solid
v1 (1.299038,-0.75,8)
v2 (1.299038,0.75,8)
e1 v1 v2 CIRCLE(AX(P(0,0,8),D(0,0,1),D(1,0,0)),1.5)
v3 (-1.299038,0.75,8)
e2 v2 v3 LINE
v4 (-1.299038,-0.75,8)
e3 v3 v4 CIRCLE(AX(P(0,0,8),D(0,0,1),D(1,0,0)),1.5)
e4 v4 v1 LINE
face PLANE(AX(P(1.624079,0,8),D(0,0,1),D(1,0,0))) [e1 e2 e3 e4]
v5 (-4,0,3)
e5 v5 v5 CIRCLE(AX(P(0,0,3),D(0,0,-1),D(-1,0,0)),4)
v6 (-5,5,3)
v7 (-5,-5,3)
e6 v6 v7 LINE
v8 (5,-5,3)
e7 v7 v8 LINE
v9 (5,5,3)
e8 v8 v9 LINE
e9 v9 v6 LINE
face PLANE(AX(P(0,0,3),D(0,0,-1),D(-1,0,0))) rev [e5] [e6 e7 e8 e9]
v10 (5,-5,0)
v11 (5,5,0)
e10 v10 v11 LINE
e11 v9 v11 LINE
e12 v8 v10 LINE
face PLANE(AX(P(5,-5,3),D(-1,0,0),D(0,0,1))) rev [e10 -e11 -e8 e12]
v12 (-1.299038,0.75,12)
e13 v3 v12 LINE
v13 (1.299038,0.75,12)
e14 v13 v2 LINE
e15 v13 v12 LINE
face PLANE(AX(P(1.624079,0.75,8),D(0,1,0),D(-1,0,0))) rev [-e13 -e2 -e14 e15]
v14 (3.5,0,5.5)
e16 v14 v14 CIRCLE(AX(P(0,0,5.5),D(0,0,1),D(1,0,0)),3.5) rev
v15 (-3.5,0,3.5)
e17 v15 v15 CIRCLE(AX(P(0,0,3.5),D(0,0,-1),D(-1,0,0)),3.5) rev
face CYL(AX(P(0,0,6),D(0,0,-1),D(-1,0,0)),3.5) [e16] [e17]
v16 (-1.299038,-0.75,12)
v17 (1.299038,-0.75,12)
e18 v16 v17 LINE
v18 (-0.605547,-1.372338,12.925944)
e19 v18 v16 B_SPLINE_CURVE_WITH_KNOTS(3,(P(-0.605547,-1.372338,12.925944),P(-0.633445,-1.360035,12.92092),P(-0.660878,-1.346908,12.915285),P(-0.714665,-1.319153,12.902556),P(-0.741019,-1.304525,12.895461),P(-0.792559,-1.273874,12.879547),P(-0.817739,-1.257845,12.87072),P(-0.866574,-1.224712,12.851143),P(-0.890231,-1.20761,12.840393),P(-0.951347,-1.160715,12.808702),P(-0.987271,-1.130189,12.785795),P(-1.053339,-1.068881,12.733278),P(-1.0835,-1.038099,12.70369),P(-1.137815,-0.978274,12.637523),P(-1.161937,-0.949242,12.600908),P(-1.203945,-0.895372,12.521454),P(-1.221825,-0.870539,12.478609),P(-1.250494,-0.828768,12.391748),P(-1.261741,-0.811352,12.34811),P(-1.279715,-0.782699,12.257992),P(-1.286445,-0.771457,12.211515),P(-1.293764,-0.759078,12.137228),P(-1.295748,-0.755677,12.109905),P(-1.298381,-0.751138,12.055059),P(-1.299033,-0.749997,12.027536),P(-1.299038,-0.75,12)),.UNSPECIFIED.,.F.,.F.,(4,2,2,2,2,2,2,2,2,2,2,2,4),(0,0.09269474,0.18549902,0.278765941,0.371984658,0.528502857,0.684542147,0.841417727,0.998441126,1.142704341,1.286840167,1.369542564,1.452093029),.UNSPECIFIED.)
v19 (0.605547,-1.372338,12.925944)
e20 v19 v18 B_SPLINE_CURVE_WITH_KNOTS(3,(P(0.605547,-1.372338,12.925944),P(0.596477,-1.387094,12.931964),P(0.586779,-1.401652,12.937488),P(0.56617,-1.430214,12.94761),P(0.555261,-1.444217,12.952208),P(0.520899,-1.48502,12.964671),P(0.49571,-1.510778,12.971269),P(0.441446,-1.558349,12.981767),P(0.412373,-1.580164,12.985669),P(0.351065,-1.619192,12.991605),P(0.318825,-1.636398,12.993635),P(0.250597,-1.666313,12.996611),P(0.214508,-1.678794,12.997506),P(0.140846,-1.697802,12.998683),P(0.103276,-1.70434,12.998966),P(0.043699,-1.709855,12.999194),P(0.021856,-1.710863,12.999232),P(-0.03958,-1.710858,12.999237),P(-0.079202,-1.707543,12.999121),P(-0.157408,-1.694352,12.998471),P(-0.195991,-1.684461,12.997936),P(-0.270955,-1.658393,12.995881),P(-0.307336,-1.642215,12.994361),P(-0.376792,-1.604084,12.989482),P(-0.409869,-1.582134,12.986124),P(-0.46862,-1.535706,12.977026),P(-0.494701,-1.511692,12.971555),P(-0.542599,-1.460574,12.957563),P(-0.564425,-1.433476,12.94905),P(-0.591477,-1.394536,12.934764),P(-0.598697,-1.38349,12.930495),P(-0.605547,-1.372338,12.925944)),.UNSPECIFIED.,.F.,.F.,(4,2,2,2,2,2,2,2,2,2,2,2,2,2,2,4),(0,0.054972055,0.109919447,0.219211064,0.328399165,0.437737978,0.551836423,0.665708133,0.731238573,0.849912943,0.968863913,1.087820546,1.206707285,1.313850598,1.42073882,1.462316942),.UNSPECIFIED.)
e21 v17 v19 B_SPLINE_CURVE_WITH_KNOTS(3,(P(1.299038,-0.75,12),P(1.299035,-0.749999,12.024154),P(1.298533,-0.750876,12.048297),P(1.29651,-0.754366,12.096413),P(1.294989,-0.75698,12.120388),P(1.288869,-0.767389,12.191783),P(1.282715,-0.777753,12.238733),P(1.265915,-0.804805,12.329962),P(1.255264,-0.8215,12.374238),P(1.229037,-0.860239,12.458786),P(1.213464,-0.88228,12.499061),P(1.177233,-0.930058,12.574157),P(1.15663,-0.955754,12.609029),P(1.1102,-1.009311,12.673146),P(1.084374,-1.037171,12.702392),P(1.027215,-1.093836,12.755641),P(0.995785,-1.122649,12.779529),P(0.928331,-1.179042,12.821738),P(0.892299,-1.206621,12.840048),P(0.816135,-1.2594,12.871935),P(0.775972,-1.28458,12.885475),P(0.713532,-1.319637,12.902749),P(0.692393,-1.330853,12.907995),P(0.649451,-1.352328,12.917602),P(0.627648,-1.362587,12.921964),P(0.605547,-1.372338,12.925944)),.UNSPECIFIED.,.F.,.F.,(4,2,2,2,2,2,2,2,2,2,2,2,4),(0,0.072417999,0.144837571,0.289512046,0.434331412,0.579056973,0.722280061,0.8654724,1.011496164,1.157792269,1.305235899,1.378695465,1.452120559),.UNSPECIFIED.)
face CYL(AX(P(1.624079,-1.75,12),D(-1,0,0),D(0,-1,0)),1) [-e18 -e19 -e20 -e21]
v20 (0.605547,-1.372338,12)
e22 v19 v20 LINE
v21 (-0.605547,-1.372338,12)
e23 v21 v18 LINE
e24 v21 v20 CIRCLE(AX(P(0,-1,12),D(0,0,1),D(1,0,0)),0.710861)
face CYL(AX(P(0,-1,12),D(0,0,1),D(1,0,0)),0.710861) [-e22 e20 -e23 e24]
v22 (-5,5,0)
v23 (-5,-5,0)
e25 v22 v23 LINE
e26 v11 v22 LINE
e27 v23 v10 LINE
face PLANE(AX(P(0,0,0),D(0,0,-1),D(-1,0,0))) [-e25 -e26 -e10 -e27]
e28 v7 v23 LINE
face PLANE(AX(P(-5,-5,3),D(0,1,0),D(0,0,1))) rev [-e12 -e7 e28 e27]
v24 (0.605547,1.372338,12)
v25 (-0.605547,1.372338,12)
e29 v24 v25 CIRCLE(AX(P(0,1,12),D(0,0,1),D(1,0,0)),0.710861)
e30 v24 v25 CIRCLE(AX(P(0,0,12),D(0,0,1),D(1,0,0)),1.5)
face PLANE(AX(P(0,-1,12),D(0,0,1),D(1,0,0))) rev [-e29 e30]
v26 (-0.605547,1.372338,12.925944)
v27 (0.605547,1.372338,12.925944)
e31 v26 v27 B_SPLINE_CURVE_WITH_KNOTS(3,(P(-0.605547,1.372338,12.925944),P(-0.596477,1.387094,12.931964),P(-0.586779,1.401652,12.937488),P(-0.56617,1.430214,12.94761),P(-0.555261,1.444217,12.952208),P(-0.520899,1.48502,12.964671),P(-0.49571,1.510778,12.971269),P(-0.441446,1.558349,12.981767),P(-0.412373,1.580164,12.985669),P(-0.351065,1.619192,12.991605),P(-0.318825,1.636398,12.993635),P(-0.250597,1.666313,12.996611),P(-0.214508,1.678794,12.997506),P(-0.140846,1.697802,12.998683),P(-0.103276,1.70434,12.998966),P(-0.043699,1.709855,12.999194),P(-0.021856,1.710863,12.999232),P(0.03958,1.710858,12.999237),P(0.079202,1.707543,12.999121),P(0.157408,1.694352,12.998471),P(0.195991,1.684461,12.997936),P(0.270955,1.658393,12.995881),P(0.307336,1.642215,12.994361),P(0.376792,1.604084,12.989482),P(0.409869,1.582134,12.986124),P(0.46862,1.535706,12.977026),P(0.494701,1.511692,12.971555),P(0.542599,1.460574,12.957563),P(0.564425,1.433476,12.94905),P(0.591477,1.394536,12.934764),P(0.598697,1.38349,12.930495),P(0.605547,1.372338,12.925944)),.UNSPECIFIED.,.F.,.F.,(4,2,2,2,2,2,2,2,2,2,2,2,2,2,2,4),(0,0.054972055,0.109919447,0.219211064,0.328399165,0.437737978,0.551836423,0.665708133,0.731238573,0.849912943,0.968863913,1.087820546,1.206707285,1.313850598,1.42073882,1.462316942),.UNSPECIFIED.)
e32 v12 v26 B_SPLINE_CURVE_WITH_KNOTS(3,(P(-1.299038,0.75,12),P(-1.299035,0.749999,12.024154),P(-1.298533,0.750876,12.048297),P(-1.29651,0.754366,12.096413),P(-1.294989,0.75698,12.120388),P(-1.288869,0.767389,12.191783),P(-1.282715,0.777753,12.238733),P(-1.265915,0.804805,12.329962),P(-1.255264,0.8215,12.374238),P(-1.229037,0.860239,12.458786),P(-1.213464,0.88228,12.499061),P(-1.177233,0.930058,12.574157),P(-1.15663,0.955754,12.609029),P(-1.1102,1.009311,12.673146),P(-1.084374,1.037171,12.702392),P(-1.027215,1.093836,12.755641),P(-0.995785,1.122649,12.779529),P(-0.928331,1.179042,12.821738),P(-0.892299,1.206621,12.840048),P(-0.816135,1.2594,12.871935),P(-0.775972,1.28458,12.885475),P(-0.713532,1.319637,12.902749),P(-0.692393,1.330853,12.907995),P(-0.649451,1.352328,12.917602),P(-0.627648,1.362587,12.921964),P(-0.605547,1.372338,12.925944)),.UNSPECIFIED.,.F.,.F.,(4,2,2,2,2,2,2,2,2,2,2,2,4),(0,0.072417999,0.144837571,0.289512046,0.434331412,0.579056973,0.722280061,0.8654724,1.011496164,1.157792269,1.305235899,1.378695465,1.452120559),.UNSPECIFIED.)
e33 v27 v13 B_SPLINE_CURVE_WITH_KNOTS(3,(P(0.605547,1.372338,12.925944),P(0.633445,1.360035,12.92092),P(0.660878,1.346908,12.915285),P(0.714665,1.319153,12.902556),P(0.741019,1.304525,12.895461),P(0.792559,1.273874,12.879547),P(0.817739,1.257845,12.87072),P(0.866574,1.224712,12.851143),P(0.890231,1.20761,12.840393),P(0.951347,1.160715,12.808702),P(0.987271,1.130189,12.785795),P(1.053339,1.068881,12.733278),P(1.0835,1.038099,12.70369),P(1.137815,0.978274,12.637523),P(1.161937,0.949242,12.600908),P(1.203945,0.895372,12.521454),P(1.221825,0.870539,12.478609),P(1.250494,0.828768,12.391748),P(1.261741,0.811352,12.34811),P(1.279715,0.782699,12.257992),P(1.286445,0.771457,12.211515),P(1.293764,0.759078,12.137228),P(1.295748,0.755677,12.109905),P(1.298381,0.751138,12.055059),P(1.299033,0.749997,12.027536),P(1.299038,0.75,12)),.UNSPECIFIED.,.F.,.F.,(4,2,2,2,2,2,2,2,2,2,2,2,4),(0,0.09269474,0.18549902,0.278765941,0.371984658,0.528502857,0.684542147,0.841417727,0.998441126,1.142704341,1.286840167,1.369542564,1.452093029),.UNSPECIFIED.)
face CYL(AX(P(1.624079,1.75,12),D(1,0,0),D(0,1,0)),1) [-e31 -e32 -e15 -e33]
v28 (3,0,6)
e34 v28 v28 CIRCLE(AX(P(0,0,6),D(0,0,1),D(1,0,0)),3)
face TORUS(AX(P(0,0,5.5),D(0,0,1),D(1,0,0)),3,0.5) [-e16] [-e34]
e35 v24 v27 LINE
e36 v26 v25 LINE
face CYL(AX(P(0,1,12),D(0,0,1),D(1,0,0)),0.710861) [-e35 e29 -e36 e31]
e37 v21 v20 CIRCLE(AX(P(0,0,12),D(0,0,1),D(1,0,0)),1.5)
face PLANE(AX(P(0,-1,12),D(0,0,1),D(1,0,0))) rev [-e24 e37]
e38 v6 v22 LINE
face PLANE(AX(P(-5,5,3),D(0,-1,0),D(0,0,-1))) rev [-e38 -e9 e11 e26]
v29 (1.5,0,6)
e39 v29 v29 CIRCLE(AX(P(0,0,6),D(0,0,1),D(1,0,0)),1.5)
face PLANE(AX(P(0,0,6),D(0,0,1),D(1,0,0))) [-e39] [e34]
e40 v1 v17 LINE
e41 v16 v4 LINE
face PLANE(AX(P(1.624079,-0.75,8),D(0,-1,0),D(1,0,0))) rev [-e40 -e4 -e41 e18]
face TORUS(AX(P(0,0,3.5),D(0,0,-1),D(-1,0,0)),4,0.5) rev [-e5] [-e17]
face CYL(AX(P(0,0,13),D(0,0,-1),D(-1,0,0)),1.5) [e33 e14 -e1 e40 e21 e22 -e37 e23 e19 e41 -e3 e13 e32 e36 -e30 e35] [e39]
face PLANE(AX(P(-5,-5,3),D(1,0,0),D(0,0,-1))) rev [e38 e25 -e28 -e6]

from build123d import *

# Parameters (mm, degrees)
ESQUISSE1_W             = 10
ESQUISSE1_H             = 10
BOSS_EXTRU_1_DEPTH      = 3
ESQUISSE2_R             = 3.5
BOSS_EXTRU_2_DEPTH      = 3
ESQUISSE5_R             = 1.5
BOSS_EXTRU_4_DEPTH      = 7
BOSS_EXTRU_5_DEPTH      = 1
ENL_V_MAT_EXTRU_1_DEPTH = 5
CONG_1_R                = 1
CONG_5_R                = 0.5


with BuildPart() as part:
    # Esquisse1 → Boss.-Extru.1 (new body)
    with BuildSketch(Plane.XY):
        Rectangle(ESQUISSE1_W, ESQUISSE1_H)
    extrude(amount=BOSS_EXTRU_1_DEPTH)

    # Esquisse2 → Boss.-Extru.2 (add)
    with BuildSketch(Plane.XY.offset(3)):
        with Locations(Location((0, 0, 0), (0, 0, 180))):
            Circle(ESQUISSE2_R)
    extrude(amount=BOSS_EXTRU_2_DEPTH)

    # Esquisse5 → Boss.-Extru.4 (add)
    with BuildSketch(Plane.XY.offset(6)):
        Circle(ESQUISSE5_R)
    extrude(amount=BOSS_EXTRU_4_DEPTH)

    # Esquisse6 → Boss.-Extru.5 (add)
    with BuildSketch(Plane.XY.offset(13)):
        with BuildLine():
            Line((-0.710860958, -1), (-0.710860958, 1))
            ThreePointArc((-0.710860958, 1), (0, 1.710860958), (0.710860958, 1))
            Line((0.710860958, 1), (0.710860958, -1))
            ThreePointArc((0.710860958, -1), (0, -1.710860958), (-0.710860958, -1))
        make_face()
    extrude(amount=-BOSS_EXTRU_5_DEPTH)

    # Esquisse7 → Enlèv. mat.-Extru.1 (cut)
    with BuildSketch(Plane.XY.offset(13)):
        with BuildLine():
            Line((1.624079267, -0.75), (-1.624079267, -0.75))
            ThreePointArc((-1.624079267, -0.75), (-2.374079267, 0), (-1.624079267, 0.75))
            Line((-1.624079267, 0.75), (1.624079267, 0.75))
            ThreePointArc((1.624079267, 0.75), (2.374079267, 0), (1.624079267, -0.75))
        make_face()
    extrude(amount=-ENL_V_MAT_EXTRU_1_DEPTH, mode=Mode.SUBTRACT)

    # Congé1
    # the kernel refuses this fillet: 1 mm, written as the material it takes off along each edge
    with BuildSketch(Plane(origin=(-3.799038106, 0.75, 13), x_dir=(0, 0, -1), z_dir=(1, 0, 0)), Plane(origin=(3.799038106, -0.75, 13), x_dir=(0, 0, -1), z_dir=(-1, 0, 0))) as cong_1_piece_1:
        with BuildLine():
            CenterArc((CONG_1_R, CONG_1_R), CONG_1_R, 180, 90)
            Line((0, CONG_1_R), (0, 0))
            Line((0, 0), (CONG_1_R, 0))
        make_face()
    extrude(amount=7.598076211, mode=Mode.SUBTRACT)

    # Congé5
    cong_5_edges = [part.edges().sort_by_distance(p)[0] for p in [
        (3.5, 0, 3),
        (3.5, 0, 6),
    ]]
    fillet(cong_5_edges, radius=CONG_5_R)


solid = part.part
